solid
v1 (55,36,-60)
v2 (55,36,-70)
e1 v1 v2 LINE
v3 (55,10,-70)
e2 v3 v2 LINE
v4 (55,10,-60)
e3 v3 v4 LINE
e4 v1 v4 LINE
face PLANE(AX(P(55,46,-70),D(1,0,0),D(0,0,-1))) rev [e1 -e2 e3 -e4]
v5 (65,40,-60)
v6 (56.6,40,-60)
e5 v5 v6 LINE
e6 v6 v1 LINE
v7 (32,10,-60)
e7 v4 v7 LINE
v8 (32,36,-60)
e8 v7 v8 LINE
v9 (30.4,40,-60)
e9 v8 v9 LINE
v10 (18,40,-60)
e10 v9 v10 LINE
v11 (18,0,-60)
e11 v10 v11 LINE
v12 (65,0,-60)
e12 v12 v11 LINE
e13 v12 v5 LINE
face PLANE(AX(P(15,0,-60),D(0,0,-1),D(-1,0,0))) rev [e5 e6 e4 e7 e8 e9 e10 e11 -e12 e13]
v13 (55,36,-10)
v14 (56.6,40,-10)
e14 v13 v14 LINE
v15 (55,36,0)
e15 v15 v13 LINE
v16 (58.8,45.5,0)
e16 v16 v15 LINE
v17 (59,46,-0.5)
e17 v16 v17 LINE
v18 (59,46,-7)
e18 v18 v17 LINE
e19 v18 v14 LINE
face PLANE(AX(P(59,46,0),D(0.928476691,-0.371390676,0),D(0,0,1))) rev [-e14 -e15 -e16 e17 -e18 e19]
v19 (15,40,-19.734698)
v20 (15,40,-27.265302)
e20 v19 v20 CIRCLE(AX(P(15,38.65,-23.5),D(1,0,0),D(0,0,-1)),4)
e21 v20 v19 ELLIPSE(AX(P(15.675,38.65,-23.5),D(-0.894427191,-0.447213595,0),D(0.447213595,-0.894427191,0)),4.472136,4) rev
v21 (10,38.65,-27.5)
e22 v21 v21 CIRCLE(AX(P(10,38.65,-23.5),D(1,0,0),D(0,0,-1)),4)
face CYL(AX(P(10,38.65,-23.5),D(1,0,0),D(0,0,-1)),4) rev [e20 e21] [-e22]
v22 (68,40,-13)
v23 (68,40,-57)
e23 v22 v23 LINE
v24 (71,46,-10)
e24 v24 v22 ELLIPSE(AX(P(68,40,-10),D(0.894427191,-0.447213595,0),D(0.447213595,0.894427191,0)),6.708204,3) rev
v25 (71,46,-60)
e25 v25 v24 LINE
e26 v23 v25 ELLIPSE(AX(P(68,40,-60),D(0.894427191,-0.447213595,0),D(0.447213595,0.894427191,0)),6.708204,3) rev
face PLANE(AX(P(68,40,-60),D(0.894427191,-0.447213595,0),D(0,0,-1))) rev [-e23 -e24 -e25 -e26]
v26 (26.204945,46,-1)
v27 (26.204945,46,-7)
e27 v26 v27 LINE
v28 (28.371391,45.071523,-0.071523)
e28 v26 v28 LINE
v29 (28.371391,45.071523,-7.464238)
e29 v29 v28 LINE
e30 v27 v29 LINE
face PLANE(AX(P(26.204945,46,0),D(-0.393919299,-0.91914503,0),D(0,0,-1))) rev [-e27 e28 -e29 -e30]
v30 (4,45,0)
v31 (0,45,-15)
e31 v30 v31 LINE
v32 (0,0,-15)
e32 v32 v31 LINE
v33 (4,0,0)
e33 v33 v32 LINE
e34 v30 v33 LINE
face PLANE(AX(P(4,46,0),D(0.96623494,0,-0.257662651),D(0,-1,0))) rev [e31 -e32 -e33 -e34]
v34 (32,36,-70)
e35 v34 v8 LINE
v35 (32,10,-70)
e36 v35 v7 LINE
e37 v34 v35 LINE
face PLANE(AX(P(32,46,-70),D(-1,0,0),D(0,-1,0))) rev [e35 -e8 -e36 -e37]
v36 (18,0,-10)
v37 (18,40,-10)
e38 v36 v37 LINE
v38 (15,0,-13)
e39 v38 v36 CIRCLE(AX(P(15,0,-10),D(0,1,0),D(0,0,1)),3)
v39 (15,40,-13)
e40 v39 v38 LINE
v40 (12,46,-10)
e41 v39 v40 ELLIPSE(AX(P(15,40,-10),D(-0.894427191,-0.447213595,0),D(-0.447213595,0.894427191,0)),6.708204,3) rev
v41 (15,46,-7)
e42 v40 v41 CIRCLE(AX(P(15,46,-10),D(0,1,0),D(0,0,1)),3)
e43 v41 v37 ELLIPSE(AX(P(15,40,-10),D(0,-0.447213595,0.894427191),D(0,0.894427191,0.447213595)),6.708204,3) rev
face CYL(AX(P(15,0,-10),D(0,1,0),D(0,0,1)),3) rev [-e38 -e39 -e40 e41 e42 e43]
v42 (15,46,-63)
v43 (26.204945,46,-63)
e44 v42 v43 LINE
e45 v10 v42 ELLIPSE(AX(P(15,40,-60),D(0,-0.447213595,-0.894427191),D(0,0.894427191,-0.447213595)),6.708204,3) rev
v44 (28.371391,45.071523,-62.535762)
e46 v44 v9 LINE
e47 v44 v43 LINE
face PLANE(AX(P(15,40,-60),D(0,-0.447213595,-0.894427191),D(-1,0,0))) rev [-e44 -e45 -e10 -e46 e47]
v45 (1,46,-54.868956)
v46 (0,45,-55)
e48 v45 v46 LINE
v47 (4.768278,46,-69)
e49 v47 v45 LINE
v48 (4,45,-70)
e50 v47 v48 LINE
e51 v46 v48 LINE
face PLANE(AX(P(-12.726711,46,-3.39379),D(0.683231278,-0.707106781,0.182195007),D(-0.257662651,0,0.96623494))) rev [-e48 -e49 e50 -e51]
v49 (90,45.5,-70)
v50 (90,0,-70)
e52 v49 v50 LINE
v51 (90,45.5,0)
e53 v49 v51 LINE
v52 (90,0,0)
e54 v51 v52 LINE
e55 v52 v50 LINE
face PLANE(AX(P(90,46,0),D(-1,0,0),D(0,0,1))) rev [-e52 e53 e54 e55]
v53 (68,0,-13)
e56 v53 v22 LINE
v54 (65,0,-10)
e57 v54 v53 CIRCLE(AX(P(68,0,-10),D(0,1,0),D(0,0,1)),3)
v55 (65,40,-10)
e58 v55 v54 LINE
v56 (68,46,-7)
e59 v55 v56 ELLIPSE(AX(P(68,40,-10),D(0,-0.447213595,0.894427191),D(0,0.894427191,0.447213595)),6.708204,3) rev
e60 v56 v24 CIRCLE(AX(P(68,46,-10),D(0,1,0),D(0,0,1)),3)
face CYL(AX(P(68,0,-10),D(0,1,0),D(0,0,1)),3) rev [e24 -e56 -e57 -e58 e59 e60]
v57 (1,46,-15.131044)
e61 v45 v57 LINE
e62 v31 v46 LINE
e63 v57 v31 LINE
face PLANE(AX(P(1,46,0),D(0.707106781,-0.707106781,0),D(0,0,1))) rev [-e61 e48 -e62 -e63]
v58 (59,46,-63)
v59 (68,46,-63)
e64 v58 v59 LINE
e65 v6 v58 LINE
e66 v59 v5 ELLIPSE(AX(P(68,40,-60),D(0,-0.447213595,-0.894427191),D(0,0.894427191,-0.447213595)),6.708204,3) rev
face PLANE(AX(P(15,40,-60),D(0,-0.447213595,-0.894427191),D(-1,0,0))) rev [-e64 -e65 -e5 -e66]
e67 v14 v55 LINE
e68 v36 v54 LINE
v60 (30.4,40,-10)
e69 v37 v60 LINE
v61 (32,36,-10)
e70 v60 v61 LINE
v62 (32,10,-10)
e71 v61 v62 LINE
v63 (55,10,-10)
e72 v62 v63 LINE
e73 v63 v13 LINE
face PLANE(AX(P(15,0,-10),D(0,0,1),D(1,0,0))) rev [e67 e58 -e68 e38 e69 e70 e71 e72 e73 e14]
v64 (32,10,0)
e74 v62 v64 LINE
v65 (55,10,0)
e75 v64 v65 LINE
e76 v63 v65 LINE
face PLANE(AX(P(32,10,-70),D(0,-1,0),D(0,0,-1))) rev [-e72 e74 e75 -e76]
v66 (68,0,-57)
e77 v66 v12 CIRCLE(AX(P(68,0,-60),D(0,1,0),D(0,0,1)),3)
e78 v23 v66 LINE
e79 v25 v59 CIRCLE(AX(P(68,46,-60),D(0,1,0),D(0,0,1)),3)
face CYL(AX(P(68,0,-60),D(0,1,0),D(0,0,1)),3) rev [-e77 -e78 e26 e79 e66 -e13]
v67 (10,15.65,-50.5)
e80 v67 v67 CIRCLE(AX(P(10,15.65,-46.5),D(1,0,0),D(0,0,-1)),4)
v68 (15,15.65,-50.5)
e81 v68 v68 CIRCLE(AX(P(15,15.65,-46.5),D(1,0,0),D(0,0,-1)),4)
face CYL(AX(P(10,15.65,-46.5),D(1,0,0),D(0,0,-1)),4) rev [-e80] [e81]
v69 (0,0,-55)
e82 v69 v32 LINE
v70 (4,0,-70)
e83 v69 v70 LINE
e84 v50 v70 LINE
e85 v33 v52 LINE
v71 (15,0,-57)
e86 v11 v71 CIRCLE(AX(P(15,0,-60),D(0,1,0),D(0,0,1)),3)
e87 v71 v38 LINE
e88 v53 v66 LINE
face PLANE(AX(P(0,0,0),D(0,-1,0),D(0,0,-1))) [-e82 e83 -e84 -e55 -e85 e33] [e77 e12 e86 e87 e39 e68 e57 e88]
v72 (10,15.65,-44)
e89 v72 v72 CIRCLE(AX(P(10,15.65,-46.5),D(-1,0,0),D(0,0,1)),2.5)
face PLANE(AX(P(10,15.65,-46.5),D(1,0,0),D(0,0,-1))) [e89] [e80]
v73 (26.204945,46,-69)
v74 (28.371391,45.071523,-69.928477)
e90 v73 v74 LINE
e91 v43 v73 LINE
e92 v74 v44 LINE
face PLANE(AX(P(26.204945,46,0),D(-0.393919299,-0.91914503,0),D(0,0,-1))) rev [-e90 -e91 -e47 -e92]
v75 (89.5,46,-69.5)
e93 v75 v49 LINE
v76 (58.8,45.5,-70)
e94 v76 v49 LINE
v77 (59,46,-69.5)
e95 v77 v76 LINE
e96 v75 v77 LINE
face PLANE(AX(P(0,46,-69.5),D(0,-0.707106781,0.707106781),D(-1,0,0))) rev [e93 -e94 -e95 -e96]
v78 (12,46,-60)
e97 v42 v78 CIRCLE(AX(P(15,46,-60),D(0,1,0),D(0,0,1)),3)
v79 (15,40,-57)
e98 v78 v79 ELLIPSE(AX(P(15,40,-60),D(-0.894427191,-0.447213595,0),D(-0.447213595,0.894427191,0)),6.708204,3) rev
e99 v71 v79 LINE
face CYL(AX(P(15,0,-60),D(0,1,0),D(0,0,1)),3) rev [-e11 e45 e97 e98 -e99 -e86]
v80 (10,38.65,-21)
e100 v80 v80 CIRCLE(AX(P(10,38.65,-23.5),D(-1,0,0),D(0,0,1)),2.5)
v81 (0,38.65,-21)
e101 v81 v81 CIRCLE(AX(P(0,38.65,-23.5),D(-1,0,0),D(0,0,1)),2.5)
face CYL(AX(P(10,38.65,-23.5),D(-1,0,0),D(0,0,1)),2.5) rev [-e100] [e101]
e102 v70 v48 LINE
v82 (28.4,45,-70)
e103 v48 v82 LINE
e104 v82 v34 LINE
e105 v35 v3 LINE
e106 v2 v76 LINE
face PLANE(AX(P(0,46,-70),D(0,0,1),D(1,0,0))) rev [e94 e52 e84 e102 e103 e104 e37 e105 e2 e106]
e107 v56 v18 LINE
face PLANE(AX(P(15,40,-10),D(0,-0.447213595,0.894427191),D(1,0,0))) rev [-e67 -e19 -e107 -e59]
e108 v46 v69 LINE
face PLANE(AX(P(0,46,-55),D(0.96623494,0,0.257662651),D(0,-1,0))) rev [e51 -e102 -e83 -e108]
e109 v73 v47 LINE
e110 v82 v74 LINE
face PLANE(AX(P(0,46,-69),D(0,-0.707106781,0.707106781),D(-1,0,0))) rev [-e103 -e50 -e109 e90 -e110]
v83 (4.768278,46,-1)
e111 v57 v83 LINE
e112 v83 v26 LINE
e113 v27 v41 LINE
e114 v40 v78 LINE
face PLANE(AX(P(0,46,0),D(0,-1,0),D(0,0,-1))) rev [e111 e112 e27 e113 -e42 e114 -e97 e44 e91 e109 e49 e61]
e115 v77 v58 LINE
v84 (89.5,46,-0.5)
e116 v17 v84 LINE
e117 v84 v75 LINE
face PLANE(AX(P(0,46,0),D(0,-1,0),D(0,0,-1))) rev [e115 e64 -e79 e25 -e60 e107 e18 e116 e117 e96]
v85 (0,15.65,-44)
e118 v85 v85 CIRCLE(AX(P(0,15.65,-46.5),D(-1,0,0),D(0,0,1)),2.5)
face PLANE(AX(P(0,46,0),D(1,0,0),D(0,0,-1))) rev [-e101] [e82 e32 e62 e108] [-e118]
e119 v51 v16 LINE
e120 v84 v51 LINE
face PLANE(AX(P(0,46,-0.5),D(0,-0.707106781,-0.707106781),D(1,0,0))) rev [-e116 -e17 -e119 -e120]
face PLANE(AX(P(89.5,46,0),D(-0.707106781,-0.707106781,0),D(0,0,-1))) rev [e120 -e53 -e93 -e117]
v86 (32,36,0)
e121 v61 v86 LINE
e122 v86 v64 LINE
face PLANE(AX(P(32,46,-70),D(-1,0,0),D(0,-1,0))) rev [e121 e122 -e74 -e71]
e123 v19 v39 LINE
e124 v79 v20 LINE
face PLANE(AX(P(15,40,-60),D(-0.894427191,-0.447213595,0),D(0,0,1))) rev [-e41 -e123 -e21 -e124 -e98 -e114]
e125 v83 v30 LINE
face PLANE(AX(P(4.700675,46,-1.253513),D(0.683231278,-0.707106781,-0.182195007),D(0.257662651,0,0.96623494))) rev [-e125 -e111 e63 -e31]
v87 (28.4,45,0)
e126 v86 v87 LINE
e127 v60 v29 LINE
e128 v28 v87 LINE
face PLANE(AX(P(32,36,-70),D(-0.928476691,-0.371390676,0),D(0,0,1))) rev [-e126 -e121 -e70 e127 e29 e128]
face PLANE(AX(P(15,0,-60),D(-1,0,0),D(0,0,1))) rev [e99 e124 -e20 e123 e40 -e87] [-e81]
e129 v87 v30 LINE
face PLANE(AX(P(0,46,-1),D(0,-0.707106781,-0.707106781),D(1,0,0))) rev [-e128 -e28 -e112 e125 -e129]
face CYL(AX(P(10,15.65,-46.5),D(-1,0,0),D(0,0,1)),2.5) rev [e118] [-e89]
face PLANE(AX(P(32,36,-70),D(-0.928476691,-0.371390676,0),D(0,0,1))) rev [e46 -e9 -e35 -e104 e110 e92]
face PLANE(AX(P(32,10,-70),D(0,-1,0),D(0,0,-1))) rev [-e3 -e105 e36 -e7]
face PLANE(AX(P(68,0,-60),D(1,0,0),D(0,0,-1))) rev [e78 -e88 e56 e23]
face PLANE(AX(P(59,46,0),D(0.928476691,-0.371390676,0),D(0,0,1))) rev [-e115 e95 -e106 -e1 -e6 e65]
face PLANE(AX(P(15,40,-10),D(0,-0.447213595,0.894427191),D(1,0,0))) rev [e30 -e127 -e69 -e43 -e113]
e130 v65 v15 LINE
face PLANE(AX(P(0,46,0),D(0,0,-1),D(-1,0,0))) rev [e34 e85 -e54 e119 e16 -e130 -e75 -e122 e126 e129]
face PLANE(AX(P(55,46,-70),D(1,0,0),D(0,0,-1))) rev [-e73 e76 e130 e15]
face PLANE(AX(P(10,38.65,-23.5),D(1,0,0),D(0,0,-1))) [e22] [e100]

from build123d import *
from OCP.BRepFilletAPI import BRepFilletAPI_MakeChamfer

# Parameters (mm, degrees)
SKETCH1_W           = 90
SKETCH1_H           = 70
BOSS_EXTRUDE1_DEPTH = 46
SKETCH2_W           = 53
SKETCH2_H           = 50
CUT_EXTRUDE1_DEPTH  = 123.947143114
SKETCH3_R           = 3
CUT_EXTRUDE2_DEPTH  = 123.947143114
SKETCH4_W           = 23
SKETCH4_H           = 36
CUT_EXTRUDE3_DEPTH  = 123.947143114
CHAMFER1_SIZE       = 10
CHAMFER1_SIZE2      = 4
CHAMFER2_SIZE       = 4
CHAMFER2_SIZE2      = 10
CHAMFER3_SIZE       = 3
CHAMFER3_SIZE_2     = 6
CHAMFER4_SIZE       = 4
CHAMFER4_SIZE2      = 15
CHAMFER5_SIZE       = 15
CHAMFER5_SIZE2      = 4
CHAMFER6_SIZE       = 1
CHAMFER6_SIZE2      = 1.795054936
CHAMFER7_SIZE       = 0.5
SKETCH5_R           = 2.5
CUT_EXTRUDE4_DEPTH  = 10
SKETCH7_R           = 4
CUT_EXTRUDE5_DEPTH  = 5


with BuildPart() as part:
    # Sketch1 → Boss-Extrude1 (new body)
    with BuildSketch(Plane(origin=(0, 0, 0), x_dir=(1, 0, 0), z_dir=(0, 1, 0))):
        with Locations((45, 35)):
            Rectangle(SKETCH1_W, SKETCH1_H)
    extrude(amount=BOSS_EXTRUDE1_DEPTH)

    # Sketch2 → Cut-Extrude1 (cut, through all)
    with BuildSketch(Plane(origin=(0, 46, 0), x_dir=(1, 0, 0), z_dir=(0, 1, 0))):
        with Locations((41.5, 35)):
            Rectangle(SKETCH2_W, SKETCH2_H)
    extrude(amount=-CUT_EXTRUDE1_DEPTH, mode=Mode.SUBTRACT)

    # Sketch3 → Cut-Extrude2 (cut, through all)
    with BuildSketch(Plane(origin=(0, 46, 0), x_dir=(1, 0, 0), z_dir=(0, 1, 0))):
        with Locations((15, 60)):
            Circle(SKETCH3_R)
        with Locations((68, 60)):
            Circle(SKETCH3_R)
        with Locations((68, 10)):
            Circle(SKETCH3_R)
        with Locations((15, 10)):
            Circle(SKETCH3_R)
    extrude(amount=-CUT_EXTRUDE2_DEPTH, mode=Mode.SUBTRACT)

    # Sketch4 → Cut-Extrude3 (cut, through all)
    with BuildSketch(Plane.XY):
        with Locations((43.5, 28)):
            Rectangle(SKETCH4_W, SKETCH4_H)
    extrude(amount=-CUT_EXTRUDE3_DEPTH, mode=Mode.SUBTRACT)

    # Chamfer1: one chamfer whose edges measure the first distance from different faces: ONE call of the kernel's chamfer builder (chamfer() names one face for all edges)
    chamfer1_edges_1 = [part.edges().sort_by_distance(p)[0] for p in [
        (55, 46, -65),
    ]]
    chamfer1_side_1 = [part.faces().sort_by_distance(p)[0] for p in [
        (55, 28, -65),
    ]]
    chamfer1_edges_2 = [part.edges().sort_by_distance(p)[0] for p in [
        (55, 46, -5),
    ]]
    chamfer1_side_2 = [part.faces().sort_by_distance(p)[0] for p in [
        (55, 28, -5),
    ]]
    chamfer1 = BRepFilletAPI_MakeChamfer(part.part.solid().wrapped)
    for e in chamfer1_edges_1:
        chamfer1.Add(CHAMFER1_SIZE, CHAMFER1_SIZE2, e.wrapped, chamfer1_side_1[0].wrapped)  # the first distance lies on this face
    for e in chamfer1_edges_2:
        chamfer1.Add(CHAMFER1_SIZE, CHAMFER1_SIZE2, e.wrapped, chamfer1_side_2[0].wrapped)  # the first distance lies on this face
    add(Compound.cast(chamfer1.Shape()), mode=Mode.REPLACE)

    # Chamfer2
    chamfer2_edges = [part.edges().sort_by_distance(p)[0] for p in [
        (32, 46, -65),
        (32, 46, -5),
    ]]
    chamfer2_side = [part.faces().sort_by_distance(p)[0] for p in [
        (11.31415673, 46, -35),
    ]]
    chamfer(chamfer2_edges, length=CHAMFER2_SIZE, length2=CHAMFER2_SIZE2, reference=chamfer2_side[0])

    # Chamfer3
    chamfer3_edges_1 = [part.edges().sort_by_distance(p)[0] for p in [
        (62, 46, -10),
    ]]
    chamfer3_side_1 = [part.faces().sort_by_distance(p)[0] for p in [
        (62, 46, -9.94),
    ]]
    chamfer3_edges_2 = [part.edges().sort_by_distance(p)[0] for p in [
        (68, 46, -35),
    ]]
    chamfer3_side_2 = [part.faces().sort_by_distance(p)[0] for p in [
        (68.06, 46, -35),
    ]]
    chamfer3_edges_3 = [part.edges().sort_by_distance(p)[0] for p in [
        (62, 46, -60),
    ]]
    chamfer3_side_3 = [part.faces().sort_by_distance(p)[0] for p in [
        (62, 46, -60.06),
    ]]
    chamfer3_edges_4 = [part.edges().sort_by_distance(p)[0] for p in [
        (23, 46, -60),
    ]]
    chamfer3_side_4 = [part.faces().sort_by_distance(p)[0] for p in [
        (23, 46, -60.06),
    ]]
    chamfer3_edges_5 = [part.edges().sort_by_distance(p)[0] for p in [
        (23, 46, -10),
    ]]
    chamfer3_side_5 = [part.faces().sort_by_distance(p)[0] for p in [
        (23, 46, -9.94),
    ]]
    chamfer3_edges_6 = [part.edges().sort_by_distance(p)[0] for p in [
        (15, 46, -35),
    ]]
    chamfer3_side_6 = [part.faces().sort_by_distance(p)[0] for p in [
        (14.94, 46, -35),
    ]]
    chamfer3 = BRepFilletAPI_MakeChamfer(part.part.solid().wrapped)
    for e in chamfer3_edges_1:
        chamfer3.Add(CHAMFER3_SIZE - 0.0001, CHAMFER3_SIZE_2 - 0.0001, e.wrapped, chamfer3_side_1[0].wrapped)
    for e in chamfer3_edges_2:
        chamfer3.Add(CHAMFER3_SIZE - 0.0001, CHAMFER3_SIZE_2 - 0.0001, e.wrapped, chamfer3_side_2[0].wrapped)
    for e in chamfer3_edges_3:
        chamfer3.Add(CHAMFER3_SIZE - 0.0001, CHAMFER3_SIZE_2 - 0.0001, e.wrapped, chamfer3_side_3[0].wrapped)
    for e in chamfer3_edges_4:
        chamfer3.Add(CHAMFER3_SIZE - 0.0001, CHAMFER3_SIZE_2 - 0.0001, e.wrapped, chamfer3_side_4[0].wrapped)
    for e in chamfer3_edges_5:
        chamfer3.Add(CHAMFER3_SIZE - 0.0001, CHAMFER3_SIZE_2 - 0.0001, e.wrapped, chamfer3_side_5[0].wrapped)
    for e in chamfer3_edges_6:
        chamfer3.Add(CHAMFER3_SIZE - 0.0001, CHAMFER3_SIZE_2 - 0.0001, e.wrapped, chamfer3_side_6[0].wrapped)
    add(Compound.cast(chamfer3.Shape()), mode=Mode.REPLACE)  # a hair under: the kernel refuses the full size

    # Chamfer4
    chamfer4_edges = [part.edges().sort_by_distance(p)[0] for p in [
        (0, 23, -70),
    ]]
    chamfer4_side = [part.faces().sort_by_distance(p)[0] for p in [
        (30.989257699, 23, -70),
    ]]
    chamfer(chamfer4_edges, length=CHAMFER4_SIZE, length2=CHAMFER4_SIZE2, reference=chamfer4_side[0])

    # Chamfer5
    chamfer5_edges = [part.edges().sort_by_distance(p)[0] for p in [
        (0, 23, 0),
    ]]
    chamfer5_side = [part.faces().sort_by_distance(p)[0] for p in [
        (0, 23, -27.5),
    ]]
    chamfer(chamfer5_edges, length=CHAMFER5_SIZE, length2=CHAMFER5_SIZE2, reference=chamfer5_side[0])

    # Chamfer6: one chamfer whose edges measure the first distance from different faces: ONE call of the kernel's chamfer builder (chamfer() names one face for all edges)
    chamfer6_edges_1 = [part.edges().sort_by_distance(p)[0] for p in [
        (16, 46, -70),
        (0, 46, -35),
        (2, 46, -62.5),
        (16, 46, 0),
        (2, 46, -7.5),
    ]]
    chamfer6_edges_2 = [part.edges().sort_by_distance(p)[0] for p in [
        (28, 46, -3.50005),
    ]]
    chamfer6_side_2 = [part.faces().sort_by_distance(p)[0] for p in [
        (30.118676116, 40.703309709, -4.604414044),
    ]]
    chamfer6_edges_3 = [part.edges().sort_by_distance(p)[0] for p in [
        (28, 46, -66.49995),
    ]]
    chamfer6_side_3 = [part.faces().sort_by_distance(p)[0] for p in [
        (30.118676116, 40.703309709, -65.395585956),
    ]]
    chamfer6 = BRepFilletAPI_MakeChamfer(part.part.solid().wrapped)
    for e in chamfer6_edges_1:
        chamfer6.Add(CHAMFER6_SIZE, e.wrapped)
    for e in chamfer6_edges_2:
        chamfer6.Add(CHAMFER6_SIZE, CHAMFER6_SIZE2, e.wrapped, chamfer6_side_2[0].wrapped)  # the first distance lies on this face
    for e in chamfer6_edges_3:
        chamfer6.Add(CHAMFER6_SIZE, CHAMFER6_SIZE2, e.wrapped, chamfer6_side_3[0].wrapped)  # the first distance lies on this face
    add(Compound.cast(chamfer6.Shape()), mode=Mode.REPLACE)

    # Chamfer7
    chamfer7_edges = [part.edges().sort_by_distance(p)[0] for p in [
        (74.5, 46, 0),
        (90, 46, -35),
        (74.5, 46, -70),
    ]]
    chamfer(chamfer7_edges, length=CHAMFER7_SIZE)

    # Sketch5 → Cut-Extrude4 (cut)
    with BuildSketch(Plane.ZY):
        with Locations((-23.5, 38.65)):
            Circle(SKETCH5_R)
        with Locations((-46.5, 15.65)):
            Circle(SKETCH5_R)
    extrude(amount=-CUT_EXTRUDE4_DEPTH, mode=Mode.SUBTRACT)

    # Sketch7 → Cut-Extrude5 (cut)
    with BuildSketch(Plane(origin=(15, 0, 0), x_dir=(0, 0, -1), z_dir=(1, 0, 0))):
        with Locations((23.5, 38.65)):
            Circle(SKETCH7_R)
        with Locations((46.5, 15.65)):
            Circle(SKETCH7_R)
    extrude(amount=-CUT_EXTRUDE5_DEPTH, mode=Mode.SUBTRACT)


solid = part.part
